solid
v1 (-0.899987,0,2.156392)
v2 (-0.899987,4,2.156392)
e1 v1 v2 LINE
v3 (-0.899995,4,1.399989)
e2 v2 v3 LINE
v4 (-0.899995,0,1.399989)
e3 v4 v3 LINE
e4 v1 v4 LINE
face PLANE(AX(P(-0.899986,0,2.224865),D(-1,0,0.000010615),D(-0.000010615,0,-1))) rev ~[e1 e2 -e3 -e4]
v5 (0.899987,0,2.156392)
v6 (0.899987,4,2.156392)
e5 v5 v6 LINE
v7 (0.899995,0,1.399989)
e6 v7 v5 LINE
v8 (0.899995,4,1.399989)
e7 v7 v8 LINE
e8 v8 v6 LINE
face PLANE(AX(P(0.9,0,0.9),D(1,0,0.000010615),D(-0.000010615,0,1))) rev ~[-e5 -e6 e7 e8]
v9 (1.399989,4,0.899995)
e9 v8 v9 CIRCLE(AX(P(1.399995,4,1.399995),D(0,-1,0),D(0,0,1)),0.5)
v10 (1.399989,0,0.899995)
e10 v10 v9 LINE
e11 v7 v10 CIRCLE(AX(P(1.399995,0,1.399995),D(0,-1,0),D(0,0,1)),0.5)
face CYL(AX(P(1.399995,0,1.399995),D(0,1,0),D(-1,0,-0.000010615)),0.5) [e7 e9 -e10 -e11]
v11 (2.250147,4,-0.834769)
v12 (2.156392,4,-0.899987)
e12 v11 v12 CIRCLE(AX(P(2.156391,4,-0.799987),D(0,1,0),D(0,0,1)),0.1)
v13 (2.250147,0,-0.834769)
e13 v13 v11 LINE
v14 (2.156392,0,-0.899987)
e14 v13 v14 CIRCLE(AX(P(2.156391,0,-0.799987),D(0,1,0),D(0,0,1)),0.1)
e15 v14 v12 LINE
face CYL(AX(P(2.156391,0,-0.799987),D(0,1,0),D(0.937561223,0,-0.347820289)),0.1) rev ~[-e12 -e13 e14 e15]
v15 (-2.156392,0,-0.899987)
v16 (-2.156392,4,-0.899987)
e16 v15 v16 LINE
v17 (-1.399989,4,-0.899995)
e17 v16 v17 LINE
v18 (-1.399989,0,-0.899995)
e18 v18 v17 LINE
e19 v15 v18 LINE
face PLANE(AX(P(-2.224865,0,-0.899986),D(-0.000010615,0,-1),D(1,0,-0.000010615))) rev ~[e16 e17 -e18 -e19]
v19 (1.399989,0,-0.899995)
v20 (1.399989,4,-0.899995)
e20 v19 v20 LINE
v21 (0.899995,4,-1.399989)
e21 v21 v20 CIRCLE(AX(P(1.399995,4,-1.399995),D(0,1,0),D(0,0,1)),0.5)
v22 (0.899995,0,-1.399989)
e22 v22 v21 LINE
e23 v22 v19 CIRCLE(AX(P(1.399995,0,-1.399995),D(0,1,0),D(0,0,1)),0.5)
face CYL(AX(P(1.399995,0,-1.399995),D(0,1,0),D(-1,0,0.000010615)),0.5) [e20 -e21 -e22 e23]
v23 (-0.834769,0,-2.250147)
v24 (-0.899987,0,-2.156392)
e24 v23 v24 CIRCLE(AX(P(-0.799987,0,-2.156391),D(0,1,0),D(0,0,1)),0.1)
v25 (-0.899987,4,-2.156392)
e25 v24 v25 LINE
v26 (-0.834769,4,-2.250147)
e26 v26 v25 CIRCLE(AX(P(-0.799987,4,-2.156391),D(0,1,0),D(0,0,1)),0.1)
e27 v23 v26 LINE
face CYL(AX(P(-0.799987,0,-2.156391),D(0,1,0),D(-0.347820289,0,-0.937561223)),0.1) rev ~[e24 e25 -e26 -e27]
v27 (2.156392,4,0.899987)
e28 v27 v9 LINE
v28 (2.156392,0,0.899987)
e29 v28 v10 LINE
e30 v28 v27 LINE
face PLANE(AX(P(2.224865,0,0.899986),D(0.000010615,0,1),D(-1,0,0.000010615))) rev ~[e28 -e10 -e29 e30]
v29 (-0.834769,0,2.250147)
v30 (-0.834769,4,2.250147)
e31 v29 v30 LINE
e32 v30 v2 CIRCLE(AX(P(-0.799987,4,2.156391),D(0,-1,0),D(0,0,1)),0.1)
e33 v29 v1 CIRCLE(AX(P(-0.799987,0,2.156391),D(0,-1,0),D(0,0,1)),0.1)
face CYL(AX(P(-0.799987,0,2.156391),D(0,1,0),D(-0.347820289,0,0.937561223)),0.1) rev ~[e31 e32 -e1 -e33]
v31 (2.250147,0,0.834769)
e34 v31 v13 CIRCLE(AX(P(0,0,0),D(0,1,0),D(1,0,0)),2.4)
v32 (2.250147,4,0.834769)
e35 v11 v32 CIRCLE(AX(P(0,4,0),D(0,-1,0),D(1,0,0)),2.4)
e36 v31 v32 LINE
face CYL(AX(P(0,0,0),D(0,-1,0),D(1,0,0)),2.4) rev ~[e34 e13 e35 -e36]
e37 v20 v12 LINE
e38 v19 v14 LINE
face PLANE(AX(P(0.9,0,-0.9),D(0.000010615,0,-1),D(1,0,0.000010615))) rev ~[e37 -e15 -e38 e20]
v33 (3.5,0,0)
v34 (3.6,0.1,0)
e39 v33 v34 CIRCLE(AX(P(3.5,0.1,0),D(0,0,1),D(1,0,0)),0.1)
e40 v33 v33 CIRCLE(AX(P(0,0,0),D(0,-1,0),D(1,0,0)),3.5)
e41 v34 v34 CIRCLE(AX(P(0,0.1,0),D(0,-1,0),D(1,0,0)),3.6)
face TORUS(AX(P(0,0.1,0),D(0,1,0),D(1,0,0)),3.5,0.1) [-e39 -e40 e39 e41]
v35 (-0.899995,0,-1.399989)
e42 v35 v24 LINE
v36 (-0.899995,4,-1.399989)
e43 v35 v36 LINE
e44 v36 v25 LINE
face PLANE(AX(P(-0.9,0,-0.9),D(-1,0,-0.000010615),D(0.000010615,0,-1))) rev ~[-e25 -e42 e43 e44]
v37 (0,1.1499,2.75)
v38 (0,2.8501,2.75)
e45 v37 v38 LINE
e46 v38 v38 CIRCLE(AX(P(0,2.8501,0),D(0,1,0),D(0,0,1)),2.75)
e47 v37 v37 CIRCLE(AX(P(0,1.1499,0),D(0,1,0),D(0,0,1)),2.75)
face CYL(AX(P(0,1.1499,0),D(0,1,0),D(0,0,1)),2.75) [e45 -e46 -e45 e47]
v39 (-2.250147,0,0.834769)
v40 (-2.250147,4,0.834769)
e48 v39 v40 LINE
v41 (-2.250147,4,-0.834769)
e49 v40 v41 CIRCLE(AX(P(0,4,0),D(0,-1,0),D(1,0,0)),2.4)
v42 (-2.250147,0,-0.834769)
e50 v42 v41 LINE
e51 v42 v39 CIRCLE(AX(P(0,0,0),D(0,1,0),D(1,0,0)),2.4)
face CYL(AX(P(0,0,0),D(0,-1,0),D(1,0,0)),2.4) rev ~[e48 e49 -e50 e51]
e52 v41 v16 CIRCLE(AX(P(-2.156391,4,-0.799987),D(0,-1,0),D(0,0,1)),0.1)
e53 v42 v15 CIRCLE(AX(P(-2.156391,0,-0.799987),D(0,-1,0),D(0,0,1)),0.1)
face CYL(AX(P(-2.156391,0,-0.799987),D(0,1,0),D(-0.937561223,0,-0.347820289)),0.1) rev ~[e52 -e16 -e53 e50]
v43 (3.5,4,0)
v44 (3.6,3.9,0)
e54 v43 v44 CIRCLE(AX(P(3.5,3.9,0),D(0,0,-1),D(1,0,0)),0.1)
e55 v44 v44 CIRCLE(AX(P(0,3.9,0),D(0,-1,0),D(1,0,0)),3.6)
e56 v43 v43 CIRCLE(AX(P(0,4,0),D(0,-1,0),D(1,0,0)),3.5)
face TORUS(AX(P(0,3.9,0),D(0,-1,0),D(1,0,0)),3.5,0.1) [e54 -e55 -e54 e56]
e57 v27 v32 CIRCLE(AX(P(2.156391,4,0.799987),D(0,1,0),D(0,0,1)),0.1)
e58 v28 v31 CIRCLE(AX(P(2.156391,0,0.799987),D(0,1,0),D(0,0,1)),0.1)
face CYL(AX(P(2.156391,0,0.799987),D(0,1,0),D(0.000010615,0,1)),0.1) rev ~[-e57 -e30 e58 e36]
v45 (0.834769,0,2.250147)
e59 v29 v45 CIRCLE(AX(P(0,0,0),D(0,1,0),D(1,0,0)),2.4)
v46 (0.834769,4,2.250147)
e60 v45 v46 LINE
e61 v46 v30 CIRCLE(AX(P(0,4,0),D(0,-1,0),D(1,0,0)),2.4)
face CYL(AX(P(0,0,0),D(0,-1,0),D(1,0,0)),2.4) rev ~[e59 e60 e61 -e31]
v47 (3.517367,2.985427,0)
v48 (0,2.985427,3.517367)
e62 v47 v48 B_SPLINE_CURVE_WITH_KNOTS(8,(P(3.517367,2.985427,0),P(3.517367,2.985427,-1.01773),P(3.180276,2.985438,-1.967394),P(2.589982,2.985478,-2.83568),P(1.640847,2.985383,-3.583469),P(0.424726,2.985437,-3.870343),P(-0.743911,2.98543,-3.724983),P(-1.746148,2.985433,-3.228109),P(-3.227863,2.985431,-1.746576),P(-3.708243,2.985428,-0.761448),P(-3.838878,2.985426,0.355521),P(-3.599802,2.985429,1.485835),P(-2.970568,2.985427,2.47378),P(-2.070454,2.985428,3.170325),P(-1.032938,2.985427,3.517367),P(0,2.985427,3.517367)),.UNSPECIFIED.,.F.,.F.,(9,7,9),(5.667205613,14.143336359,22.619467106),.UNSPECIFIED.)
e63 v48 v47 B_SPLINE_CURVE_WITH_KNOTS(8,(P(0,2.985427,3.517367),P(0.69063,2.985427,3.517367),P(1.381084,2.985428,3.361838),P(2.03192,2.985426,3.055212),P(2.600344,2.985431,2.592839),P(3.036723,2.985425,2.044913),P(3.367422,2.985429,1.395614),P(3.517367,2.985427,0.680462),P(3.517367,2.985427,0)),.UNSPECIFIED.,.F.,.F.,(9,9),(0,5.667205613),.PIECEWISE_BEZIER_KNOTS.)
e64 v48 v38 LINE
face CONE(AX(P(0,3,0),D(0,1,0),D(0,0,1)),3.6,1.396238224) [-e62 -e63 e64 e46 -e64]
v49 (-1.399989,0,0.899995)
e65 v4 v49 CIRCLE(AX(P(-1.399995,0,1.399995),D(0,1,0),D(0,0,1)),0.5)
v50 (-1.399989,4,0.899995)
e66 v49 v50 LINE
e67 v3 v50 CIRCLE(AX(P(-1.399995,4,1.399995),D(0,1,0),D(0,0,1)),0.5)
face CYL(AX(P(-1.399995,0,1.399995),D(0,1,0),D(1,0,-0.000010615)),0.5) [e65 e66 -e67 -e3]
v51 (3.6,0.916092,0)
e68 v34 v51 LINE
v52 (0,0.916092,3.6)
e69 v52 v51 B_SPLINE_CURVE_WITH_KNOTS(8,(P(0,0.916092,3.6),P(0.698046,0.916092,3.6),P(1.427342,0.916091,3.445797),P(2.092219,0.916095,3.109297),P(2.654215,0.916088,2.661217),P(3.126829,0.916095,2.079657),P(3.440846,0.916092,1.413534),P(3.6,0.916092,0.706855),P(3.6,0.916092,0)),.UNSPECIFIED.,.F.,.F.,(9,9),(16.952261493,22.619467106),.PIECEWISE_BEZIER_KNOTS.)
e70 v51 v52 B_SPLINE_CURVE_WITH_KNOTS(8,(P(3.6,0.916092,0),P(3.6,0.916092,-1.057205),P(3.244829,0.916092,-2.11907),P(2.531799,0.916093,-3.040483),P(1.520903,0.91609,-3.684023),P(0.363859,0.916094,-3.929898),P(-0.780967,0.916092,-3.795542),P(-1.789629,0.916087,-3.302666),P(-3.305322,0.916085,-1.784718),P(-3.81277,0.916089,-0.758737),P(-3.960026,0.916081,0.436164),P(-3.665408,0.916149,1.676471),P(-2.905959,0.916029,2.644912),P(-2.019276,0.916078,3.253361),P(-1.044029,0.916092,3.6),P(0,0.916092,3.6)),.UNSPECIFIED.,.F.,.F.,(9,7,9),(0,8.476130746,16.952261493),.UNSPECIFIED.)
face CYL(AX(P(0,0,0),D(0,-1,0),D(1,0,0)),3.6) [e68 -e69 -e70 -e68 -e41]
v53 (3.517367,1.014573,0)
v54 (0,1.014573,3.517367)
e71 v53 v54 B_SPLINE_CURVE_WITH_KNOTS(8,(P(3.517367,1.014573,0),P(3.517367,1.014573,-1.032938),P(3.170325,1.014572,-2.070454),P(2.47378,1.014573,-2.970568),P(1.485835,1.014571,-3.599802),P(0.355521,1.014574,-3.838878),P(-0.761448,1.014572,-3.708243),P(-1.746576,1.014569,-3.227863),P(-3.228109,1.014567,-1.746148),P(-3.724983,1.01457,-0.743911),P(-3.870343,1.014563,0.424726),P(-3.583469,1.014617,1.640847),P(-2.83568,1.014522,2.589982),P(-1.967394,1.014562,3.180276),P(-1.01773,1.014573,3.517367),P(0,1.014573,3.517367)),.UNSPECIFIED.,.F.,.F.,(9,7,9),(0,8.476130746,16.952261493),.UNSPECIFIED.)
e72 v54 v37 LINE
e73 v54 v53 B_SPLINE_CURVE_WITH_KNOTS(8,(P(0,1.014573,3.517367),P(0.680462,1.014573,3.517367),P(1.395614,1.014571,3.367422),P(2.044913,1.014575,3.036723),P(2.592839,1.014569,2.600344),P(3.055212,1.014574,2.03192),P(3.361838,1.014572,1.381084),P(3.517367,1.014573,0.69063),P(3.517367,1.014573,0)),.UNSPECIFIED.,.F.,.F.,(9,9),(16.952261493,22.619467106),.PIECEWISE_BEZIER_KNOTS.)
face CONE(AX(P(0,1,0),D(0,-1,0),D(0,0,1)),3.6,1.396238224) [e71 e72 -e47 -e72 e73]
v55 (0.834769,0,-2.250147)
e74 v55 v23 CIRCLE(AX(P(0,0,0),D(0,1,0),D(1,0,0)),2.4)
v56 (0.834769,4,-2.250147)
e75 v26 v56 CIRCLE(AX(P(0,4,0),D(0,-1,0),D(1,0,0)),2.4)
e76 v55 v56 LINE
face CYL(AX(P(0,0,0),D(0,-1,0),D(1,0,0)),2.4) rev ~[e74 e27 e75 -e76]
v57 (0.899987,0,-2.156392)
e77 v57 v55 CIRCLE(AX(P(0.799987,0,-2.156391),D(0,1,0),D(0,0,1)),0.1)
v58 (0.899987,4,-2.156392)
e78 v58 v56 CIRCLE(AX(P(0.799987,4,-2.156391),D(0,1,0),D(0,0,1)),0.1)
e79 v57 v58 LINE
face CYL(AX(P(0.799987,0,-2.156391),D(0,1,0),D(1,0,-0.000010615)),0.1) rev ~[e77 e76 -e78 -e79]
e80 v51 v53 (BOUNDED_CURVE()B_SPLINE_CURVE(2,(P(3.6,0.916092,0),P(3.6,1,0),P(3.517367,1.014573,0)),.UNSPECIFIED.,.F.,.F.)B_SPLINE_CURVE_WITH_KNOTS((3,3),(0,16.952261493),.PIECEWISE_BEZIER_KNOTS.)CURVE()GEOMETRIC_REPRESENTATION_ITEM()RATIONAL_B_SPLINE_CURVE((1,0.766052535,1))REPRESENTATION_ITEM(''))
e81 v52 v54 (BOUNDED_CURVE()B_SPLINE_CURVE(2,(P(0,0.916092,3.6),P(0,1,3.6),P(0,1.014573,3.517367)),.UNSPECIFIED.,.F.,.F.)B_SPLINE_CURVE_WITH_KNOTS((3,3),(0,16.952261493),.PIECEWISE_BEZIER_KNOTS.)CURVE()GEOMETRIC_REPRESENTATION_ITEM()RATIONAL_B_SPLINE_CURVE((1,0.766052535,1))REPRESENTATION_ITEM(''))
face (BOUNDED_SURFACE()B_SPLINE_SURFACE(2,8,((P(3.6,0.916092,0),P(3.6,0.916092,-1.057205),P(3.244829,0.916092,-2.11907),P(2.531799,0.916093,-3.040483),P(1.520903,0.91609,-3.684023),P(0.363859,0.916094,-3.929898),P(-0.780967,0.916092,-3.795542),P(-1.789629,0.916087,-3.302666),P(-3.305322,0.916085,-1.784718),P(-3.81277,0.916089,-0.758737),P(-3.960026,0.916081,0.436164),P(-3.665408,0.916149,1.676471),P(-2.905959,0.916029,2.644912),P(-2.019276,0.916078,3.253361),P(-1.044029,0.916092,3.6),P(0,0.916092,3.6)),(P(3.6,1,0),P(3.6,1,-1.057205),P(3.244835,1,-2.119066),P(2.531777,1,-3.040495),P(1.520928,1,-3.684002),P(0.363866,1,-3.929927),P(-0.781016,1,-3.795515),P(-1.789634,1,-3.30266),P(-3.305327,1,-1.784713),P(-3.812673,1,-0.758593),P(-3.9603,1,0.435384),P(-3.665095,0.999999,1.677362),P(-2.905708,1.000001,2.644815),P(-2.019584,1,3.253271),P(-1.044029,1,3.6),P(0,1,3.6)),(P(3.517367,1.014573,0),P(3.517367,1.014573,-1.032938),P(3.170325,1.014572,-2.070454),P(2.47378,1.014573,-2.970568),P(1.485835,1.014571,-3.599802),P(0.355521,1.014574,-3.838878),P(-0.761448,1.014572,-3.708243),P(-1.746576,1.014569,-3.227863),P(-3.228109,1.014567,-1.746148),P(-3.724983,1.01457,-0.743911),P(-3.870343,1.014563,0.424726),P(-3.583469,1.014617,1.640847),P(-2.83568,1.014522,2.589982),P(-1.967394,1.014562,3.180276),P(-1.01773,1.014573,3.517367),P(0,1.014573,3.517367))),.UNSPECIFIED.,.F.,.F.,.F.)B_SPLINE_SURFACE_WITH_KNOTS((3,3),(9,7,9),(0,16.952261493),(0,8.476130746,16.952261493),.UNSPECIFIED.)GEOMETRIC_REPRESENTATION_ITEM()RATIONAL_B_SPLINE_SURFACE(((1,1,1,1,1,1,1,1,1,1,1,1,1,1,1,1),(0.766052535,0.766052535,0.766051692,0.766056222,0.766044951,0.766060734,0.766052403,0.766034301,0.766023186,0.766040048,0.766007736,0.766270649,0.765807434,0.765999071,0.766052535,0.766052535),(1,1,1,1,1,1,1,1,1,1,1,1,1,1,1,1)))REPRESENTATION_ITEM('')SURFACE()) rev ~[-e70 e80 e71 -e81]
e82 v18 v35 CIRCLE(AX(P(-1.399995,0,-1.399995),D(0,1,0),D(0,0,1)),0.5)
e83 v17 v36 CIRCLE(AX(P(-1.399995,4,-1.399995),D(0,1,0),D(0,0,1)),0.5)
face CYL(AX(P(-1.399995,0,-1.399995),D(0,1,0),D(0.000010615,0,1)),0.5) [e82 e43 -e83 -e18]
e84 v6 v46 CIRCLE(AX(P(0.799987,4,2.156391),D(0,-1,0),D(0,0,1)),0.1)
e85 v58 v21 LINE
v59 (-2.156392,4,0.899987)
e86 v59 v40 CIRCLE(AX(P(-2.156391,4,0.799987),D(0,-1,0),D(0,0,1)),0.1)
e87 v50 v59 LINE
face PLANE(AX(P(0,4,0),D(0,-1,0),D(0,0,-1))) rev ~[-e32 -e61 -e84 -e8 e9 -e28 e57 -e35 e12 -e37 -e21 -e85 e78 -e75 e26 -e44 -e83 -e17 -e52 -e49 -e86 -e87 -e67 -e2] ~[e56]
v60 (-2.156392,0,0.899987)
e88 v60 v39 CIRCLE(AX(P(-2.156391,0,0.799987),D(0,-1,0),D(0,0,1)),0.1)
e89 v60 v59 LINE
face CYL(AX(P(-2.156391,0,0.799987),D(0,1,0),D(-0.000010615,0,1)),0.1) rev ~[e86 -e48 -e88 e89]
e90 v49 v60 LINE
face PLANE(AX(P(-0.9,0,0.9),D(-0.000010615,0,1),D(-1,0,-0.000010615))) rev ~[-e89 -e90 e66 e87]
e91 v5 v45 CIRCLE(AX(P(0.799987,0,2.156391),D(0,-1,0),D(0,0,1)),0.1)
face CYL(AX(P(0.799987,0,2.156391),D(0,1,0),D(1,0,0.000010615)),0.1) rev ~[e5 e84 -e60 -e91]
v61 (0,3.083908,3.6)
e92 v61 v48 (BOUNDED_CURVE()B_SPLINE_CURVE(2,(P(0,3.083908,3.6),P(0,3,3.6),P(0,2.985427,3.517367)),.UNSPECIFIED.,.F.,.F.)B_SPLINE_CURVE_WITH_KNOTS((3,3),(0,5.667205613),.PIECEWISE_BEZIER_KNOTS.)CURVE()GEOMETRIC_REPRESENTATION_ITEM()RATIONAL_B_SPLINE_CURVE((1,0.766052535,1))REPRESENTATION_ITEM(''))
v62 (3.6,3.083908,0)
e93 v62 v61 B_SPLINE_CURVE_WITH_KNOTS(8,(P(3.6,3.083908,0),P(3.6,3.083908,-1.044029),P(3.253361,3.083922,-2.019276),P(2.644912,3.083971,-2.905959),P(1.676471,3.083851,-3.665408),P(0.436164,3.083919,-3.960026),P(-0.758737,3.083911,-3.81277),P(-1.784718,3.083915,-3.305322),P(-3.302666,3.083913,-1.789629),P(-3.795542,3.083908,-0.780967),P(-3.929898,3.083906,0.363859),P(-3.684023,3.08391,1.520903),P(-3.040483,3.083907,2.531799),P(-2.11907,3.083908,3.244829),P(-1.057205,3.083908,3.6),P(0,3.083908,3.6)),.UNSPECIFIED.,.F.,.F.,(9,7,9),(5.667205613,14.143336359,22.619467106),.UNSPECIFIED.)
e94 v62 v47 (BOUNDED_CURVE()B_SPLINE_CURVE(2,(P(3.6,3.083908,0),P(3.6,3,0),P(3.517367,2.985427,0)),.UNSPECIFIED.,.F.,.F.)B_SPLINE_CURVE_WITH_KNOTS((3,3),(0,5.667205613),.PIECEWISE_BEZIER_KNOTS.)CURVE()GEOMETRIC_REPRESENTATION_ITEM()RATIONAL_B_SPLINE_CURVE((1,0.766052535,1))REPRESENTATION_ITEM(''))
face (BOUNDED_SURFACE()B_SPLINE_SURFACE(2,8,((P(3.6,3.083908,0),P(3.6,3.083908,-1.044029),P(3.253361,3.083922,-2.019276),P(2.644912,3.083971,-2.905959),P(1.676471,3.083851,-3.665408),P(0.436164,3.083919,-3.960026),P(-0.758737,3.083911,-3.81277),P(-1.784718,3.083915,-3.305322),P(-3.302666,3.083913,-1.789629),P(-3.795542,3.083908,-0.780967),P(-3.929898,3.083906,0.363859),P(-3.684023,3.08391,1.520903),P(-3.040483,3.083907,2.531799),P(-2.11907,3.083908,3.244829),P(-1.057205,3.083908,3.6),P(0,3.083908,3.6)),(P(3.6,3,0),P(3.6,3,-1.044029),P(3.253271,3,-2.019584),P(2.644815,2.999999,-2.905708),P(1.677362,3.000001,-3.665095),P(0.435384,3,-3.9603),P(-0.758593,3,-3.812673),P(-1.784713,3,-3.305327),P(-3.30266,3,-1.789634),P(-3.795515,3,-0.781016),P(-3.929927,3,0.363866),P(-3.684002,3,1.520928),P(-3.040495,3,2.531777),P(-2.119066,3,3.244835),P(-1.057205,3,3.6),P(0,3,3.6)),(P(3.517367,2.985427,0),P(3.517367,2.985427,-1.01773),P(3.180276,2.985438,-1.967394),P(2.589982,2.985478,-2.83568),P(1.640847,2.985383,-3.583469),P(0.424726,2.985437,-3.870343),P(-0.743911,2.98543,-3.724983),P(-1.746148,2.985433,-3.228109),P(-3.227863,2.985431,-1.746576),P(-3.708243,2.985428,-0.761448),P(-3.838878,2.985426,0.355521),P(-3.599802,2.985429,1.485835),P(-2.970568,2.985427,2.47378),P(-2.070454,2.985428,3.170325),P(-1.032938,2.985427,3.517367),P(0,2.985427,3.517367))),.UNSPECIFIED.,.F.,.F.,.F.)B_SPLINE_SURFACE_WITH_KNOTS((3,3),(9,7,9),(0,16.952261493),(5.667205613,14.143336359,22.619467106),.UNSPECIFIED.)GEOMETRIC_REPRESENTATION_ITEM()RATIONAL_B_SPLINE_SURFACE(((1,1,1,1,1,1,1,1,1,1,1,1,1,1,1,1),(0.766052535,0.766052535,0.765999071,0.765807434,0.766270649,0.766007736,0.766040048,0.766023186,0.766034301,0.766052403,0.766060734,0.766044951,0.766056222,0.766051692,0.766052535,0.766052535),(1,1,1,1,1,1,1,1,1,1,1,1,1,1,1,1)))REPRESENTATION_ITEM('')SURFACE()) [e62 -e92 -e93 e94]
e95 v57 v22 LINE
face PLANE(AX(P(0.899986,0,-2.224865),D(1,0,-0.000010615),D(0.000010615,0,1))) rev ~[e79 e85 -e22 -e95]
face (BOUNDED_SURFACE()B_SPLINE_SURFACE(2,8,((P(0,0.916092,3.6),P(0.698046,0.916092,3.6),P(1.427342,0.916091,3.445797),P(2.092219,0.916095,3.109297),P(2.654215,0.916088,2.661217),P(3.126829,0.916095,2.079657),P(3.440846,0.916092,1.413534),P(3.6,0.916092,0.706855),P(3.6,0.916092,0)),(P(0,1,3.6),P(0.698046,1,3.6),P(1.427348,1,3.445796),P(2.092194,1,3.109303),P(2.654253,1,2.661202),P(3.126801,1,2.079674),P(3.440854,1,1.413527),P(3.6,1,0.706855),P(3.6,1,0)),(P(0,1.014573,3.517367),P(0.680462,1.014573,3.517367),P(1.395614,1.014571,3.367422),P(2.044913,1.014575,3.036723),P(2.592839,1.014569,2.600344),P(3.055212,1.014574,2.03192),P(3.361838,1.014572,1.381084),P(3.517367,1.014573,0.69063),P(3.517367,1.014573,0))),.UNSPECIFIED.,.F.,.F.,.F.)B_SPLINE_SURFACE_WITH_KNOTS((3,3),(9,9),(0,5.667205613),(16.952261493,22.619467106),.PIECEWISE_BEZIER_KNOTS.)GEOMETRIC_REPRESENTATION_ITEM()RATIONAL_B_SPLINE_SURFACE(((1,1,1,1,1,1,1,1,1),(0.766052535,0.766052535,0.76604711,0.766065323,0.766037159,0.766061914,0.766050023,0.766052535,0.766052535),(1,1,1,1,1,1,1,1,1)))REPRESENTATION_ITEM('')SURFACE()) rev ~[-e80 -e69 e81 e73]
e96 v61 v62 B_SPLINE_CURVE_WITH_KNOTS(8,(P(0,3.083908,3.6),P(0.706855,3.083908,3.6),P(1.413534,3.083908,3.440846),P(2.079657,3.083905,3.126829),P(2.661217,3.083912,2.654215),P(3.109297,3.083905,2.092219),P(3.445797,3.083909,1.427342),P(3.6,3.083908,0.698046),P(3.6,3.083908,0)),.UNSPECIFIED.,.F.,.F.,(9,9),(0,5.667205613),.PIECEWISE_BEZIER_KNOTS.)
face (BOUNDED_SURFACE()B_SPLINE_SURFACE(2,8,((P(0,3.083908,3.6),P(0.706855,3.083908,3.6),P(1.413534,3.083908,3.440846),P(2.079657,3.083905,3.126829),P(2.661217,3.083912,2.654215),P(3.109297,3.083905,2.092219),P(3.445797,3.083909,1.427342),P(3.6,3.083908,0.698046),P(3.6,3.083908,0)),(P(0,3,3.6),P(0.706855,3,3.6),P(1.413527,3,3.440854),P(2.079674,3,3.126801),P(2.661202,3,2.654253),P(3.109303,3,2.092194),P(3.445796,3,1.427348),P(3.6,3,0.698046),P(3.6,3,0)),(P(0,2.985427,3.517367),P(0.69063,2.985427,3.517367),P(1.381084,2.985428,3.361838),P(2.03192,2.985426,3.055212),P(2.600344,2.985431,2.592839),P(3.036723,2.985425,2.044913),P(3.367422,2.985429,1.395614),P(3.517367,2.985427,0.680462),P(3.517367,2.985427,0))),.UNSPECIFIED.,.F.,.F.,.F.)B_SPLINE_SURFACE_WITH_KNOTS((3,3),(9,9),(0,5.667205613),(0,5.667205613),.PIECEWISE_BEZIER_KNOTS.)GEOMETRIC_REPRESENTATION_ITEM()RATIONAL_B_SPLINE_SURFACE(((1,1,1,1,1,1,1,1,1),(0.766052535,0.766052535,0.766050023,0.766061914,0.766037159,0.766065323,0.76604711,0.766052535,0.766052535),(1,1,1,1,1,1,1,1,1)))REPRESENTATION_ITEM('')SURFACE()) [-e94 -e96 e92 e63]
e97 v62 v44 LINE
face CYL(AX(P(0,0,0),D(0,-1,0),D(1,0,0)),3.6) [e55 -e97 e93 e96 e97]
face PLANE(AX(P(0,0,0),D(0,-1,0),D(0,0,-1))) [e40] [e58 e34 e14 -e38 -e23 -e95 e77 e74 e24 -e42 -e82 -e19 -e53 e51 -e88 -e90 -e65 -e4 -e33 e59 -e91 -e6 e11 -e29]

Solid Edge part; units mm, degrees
sketch "Sketch1" plane through (0, 0, 0) normal (0, -1, 0) x (1, 0, 0)
  circle A0 centre (0, 0) radius 3.6
extrude "Protrusion1" add sketch "Sketch1" against normal blind 4
sketch "Sketch2" plane through (0, 0, 0) normal (0, -1, 0) x (1, 0, 0)
  line L0 (0.9, 0.9) -> (0.9, 2.2249)
  arc A0 (-0.9, 2.2249) -> (0.9, 2.2249) centre (0, 0) cw
  line L1 (-0.9, 2.2249) -> (-0.9, 0.9)
  line L2 (-0.9, 0.9) -> (-2.2249, 0.9)
  line L3 (-2.2249, -0.9) -> (-0.9, -0.9)
  line L4 (-0.9, -0.9) -> (-0.9, -2.2249)
  arc A1 (0.9, -2.2249) -> (-0.9, -2.2249) centre (0, 0) cw
  line L5 (0.9, -2.2249) -> (0.9, -0.9)
  line L6 (0.9, -0.9) -> (2.2249, -0.9)
  arc A2 (2.2249, 0.9) -> (2.2249, -0.9) centre (0, 0) cw
  line L7 (2.2249, 0.9) -> (0.9, 0.9)
  arc A3 (-2.2249, -0.9) -> (-2.2249, 0.9) centre (0, 0) cw
extrude "ExtrudedCutout_1" cut sketch "Sketch2" against normal blind 15
fillet "Round1" radius 0.5 4 edges at (-0.9, 2, 0.9) (-0.9, 2, -0.9) (0.9, 2, -0.9) (0.9, 2, 0.9)
fillet "Round_5" radius 0.1 8 edges at (-0.9, 2, 2.2249) (-2.2249, 2, 0.9) (0.9, 2, 2.2249) (2.2249, 2, 0.9) (2.2249, 2, -0.9) (0.9, 2, -2.2249) (-0.9, 2, -2.2249) (-2.2249, 2, -0.9)
sketch "Sketch3" plane through (0, 0, 0) normal (1, 0, 0) x (0, 1, 0)
  line L0 (1.1499, 2.75) -> (2.8501, 2.75)
  line L1 (3, 3.6) -> (2.8501, 2.75)
  line L2 (1, 3.6) -> (3, 3.6)
  line L3 (1, 3.6) -> (1.1499, 2.75)
revolve "RevolvedCutout1" cut sketch "Sketch3" angle 360 about axis through (0, -60, 0) along (0, 1, 0)
fillet "Round2" radius 0.1 4 edges at (0, 1, 3.6) (0, 3, 3.6) (-3.6, 4, 0) (-3.6, 0, 0)
